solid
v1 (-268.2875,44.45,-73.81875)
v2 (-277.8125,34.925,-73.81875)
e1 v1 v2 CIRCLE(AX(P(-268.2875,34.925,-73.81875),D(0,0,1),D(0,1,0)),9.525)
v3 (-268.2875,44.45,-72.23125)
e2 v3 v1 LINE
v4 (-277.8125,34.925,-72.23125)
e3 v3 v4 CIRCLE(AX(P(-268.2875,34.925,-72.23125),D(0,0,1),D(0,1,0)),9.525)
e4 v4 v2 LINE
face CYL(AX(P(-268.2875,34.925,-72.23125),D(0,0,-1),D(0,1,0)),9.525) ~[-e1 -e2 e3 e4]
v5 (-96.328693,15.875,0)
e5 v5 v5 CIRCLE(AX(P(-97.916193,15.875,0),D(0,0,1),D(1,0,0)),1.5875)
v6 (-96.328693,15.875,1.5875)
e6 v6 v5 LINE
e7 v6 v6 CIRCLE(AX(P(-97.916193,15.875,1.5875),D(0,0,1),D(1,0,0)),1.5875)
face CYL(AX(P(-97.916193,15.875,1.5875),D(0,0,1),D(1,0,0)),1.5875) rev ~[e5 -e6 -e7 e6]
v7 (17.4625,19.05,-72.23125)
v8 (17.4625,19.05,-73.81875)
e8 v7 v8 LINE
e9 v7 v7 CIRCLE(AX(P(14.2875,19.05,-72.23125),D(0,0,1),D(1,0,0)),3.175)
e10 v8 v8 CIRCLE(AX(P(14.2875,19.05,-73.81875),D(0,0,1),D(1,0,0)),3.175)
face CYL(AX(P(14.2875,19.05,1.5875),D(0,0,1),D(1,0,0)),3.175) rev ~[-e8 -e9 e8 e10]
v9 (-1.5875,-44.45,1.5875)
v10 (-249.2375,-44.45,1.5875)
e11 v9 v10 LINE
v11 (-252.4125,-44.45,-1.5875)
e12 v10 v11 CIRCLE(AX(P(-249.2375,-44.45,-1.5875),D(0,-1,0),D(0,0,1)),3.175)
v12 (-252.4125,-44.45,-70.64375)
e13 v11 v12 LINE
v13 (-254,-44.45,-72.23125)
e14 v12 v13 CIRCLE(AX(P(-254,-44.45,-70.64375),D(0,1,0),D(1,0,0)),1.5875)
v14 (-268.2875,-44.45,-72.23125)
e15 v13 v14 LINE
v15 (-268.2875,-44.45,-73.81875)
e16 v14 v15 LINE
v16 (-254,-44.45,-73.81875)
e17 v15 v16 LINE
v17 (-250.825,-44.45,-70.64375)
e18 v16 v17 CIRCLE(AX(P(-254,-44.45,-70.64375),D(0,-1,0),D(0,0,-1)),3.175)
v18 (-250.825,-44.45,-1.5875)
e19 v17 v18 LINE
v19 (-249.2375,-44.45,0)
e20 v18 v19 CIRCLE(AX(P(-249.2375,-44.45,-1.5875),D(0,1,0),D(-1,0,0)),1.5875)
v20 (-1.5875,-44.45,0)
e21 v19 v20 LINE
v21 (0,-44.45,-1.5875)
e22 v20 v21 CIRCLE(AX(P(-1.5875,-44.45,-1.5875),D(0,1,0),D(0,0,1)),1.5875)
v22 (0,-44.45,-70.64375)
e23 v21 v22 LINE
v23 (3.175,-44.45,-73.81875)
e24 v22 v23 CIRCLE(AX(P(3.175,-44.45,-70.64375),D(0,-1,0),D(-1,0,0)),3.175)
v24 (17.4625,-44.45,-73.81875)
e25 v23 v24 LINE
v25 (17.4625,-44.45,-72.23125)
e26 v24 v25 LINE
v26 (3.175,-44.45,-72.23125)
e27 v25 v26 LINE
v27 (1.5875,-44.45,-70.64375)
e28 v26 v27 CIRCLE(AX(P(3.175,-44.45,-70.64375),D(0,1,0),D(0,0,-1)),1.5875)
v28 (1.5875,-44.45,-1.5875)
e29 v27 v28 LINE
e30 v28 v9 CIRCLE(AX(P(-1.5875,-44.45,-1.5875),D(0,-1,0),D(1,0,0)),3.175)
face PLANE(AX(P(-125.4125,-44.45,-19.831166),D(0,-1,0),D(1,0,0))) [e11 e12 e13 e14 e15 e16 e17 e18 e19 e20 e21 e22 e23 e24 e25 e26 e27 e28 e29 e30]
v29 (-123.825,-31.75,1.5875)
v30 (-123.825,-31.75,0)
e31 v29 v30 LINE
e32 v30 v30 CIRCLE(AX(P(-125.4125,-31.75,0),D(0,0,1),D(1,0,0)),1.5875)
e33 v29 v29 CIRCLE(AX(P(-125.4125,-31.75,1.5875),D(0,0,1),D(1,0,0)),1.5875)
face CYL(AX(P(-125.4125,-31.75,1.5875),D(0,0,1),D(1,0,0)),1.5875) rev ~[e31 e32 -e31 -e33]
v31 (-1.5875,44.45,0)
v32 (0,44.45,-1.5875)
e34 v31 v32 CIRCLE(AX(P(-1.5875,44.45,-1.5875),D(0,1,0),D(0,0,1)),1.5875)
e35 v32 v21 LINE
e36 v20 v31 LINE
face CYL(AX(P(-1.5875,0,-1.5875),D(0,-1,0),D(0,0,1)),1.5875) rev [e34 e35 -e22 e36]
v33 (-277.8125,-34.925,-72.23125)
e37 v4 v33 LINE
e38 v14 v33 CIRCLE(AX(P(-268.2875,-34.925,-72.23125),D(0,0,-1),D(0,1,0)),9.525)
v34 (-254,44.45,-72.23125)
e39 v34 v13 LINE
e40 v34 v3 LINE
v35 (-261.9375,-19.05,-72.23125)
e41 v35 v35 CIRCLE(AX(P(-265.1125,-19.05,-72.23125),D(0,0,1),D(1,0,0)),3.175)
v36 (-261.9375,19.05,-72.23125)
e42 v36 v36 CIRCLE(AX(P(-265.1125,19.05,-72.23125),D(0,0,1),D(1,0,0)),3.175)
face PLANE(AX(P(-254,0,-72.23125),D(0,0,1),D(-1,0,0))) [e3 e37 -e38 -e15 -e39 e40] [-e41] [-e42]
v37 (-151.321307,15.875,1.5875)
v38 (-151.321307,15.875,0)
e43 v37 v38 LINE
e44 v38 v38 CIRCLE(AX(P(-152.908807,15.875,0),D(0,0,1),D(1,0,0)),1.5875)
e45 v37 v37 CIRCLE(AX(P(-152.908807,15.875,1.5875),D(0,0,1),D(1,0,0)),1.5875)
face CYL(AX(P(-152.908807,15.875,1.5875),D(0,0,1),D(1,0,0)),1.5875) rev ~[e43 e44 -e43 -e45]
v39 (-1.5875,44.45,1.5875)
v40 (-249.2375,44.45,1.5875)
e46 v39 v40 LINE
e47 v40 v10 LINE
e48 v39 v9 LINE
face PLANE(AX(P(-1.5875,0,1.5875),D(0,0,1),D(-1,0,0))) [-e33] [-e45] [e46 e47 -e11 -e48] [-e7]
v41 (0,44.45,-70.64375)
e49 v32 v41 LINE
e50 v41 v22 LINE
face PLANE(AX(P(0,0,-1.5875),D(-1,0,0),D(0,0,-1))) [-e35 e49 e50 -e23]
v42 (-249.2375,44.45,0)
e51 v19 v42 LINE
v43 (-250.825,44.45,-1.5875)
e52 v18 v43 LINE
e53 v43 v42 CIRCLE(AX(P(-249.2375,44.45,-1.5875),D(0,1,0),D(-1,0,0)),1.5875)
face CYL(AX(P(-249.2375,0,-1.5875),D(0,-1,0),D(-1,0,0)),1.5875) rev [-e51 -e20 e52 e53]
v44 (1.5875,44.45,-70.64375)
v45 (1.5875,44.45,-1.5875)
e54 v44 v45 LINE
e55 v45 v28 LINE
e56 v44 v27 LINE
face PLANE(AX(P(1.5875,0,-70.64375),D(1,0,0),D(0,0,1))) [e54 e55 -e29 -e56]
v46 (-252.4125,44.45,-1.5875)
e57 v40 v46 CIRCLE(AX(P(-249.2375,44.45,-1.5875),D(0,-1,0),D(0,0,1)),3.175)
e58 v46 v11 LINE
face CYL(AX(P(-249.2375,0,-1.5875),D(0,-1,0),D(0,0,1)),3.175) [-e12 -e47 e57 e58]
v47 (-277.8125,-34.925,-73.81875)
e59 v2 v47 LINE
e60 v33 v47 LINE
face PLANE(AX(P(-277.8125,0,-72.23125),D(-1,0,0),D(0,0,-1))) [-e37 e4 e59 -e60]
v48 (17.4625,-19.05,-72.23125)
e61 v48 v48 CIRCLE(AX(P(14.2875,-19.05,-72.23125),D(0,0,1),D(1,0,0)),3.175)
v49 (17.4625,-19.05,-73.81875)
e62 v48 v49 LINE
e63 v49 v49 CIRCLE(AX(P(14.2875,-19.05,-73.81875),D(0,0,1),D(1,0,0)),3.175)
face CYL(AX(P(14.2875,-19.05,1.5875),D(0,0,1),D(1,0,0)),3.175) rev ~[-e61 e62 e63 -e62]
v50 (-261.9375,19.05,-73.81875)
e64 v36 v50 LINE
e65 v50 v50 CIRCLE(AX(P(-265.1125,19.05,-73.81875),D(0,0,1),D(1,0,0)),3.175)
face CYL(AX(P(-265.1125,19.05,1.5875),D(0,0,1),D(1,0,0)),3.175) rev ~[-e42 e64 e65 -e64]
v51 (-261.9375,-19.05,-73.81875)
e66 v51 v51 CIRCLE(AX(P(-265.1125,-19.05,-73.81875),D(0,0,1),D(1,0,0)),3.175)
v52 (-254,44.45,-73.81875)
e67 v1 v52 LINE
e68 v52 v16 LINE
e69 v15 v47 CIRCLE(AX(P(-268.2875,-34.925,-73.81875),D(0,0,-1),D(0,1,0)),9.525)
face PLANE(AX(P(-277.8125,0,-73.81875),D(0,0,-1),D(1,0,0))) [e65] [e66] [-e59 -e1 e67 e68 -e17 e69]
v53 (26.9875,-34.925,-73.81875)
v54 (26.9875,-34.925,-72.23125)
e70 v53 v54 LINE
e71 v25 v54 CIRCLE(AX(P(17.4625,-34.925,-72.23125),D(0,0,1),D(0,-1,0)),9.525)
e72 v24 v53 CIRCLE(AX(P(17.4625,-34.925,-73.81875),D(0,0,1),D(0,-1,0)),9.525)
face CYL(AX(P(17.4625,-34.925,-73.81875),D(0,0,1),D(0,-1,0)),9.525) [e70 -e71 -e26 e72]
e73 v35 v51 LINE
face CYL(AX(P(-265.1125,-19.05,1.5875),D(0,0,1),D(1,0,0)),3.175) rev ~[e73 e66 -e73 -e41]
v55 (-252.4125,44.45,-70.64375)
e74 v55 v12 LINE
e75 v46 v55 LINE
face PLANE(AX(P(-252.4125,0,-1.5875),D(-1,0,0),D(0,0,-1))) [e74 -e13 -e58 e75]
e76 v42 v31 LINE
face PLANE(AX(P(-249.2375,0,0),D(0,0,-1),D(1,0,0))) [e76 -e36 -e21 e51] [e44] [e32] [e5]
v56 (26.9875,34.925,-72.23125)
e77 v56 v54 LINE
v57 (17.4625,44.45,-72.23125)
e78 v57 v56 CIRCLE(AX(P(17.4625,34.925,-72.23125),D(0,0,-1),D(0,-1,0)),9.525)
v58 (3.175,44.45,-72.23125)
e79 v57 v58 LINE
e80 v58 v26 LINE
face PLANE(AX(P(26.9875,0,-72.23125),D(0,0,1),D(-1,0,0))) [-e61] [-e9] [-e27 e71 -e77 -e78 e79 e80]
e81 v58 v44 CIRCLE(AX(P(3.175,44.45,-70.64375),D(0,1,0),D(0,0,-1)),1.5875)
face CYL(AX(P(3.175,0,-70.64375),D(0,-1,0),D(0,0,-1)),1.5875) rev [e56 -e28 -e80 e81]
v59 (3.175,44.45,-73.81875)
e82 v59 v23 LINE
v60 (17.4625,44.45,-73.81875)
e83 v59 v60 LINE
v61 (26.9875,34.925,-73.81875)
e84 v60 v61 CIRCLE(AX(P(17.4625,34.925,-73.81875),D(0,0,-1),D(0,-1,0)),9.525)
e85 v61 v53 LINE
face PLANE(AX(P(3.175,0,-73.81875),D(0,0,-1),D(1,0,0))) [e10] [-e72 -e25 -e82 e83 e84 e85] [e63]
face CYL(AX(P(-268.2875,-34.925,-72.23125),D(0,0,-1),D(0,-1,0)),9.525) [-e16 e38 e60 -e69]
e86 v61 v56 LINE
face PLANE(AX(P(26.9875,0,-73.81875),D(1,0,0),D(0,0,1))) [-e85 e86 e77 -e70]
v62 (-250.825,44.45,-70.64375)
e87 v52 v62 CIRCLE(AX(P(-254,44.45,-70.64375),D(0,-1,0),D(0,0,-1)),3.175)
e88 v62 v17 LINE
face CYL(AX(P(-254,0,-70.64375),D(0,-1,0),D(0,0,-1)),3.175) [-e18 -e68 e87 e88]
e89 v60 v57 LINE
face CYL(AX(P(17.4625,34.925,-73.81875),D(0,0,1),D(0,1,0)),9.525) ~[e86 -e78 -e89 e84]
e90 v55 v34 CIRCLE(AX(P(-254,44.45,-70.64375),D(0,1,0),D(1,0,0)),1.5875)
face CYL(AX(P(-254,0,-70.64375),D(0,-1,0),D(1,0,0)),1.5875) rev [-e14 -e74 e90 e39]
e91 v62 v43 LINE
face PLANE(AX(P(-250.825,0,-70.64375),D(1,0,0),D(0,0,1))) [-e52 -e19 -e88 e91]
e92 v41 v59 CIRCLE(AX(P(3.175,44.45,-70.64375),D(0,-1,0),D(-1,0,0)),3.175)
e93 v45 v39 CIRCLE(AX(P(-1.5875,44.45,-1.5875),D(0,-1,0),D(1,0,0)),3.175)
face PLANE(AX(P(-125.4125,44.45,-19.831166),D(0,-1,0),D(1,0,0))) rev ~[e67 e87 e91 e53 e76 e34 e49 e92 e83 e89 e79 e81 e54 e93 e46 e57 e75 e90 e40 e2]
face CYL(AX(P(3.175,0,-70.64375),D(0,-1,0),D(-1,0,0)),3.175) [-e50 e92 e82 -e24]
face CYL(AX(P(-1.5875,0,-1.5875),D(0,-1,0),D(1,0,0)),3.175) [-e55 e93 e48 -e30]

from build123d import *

# Parameters (mm, degrees)
F1_DEPTH = 44.45
F2_R     = 3.175
F2_R_2   = 1.5875
F3_DEPTH = 75.40725
F4_R     = 9.525


with BuildPart() as f1:
    # F0 (on Front) → F1 (new body, symmetric)
    with BuildSketch(Plane.XZ):
        with BuildLine():
            Line((-125.4125, 0), (-1.5875, 0))
            ThreePointArc((-1.5875, 0), (-0.4649679849, -0.4649679849), (0, -1.5875))
            Line((0, -1.5875), (0, -70.64375))
            ThreePointArc((0, -70.64375), (0.9299359697, -72.8888140303), (3.175, -73.81875))
            Line((3.175, -73.81875), (26.9875, -73.81875))
            Line((26.9875, -73.81875), (26.9875, -72.23125))
            Line((26.9875, -72.23125), (3.175, -72.23125))
            ThreePointArc((3.175, -72.23125), (2.0524679849, -71.7662820151), (1.5875, -70.64375))
            Line((1.5875, -70.64375), (1.5875, -1.5875))
            ThreePointArc((1.5875, -1.5875), (0.6575640303, 0.6575640303), (-1.5875, 1.5875))
            Line((-1.5875, 1.5875), (-125.4125, 1.5875))
            Line((-125.4125, 1.5875), (-249.2375, 1.5875))
            ThreePointArc((-249.2375, 1.5875), (-251.4825640303, 0.6575640303), (-252.4125, -1.5875))
            Line((-252.4125, -1.5875), (-252.4125, -70.64375))
            ThreePointArc((-252.4125, -70.64375), (-252.8774679849, -71.7662820151), (-254, -72.23125))
            Line((-254, -72.23125), (-277.8125, -72.23125))
            Line((-277.8125, -72.23125), (-277.8125, -73.81875))
            Line((-277.8125, -73.81875), (-254, -73.81875))
            ThreePointArc((-254, -73.81875), (-251.7549359697, -72.8888140303), (-250.825, -70.64375))
            Line((-250.825, -70.64375), (-250.825, -1.5875))
            ThreePointArc((-250.825, -1.5875), (-250.3600320151, -0.4649679849), (-249.2375, 0))
            Line((-249.2375, 0), (-125.4125, 0))
        make_face()
    extrude(amount=F1_DEPTH, both=True)

    # F2 (on face) → F3 (cut, through all)
    with BuildSketch(Plane.XY.offset(1.5875)):
        with Locations((14.2875, 19.05)):
            Circle(F2_R)
        with Locations((14.2875, -19.05)):
            Circle(F2_R)
        with Locations((-125.4125, -31.75)):
            Circle(F2_R_2)
        with Locations((-97.9161934298, 15.875)):
            Circle(F2_R_2)
        with Locations((-152.9088065702, 15.875)):
            Circle(F2_R_2)
        with Locations((-265.1125, 19.05)):
            Circle(F2_R)
        with Locations((-265.1125, -19.05)):
            Circle(F2_R)
    extrude(amount=-F3_DEPTH, mode=Mode.SUBTRACT)

    # F4
    f4_edges = [f1.edges().sort_by_distance(p)[0] for p in [
        (26.9875, 44.45, -73.025),
        (26.9875, -44.45, -73.025),
        (-277.8125, -44.45, -73.025),
        (-277.8125, 44.45, -73.025),
    ]]
    fillet(f4_edges, radius=F4_R)


solid = f1.part
